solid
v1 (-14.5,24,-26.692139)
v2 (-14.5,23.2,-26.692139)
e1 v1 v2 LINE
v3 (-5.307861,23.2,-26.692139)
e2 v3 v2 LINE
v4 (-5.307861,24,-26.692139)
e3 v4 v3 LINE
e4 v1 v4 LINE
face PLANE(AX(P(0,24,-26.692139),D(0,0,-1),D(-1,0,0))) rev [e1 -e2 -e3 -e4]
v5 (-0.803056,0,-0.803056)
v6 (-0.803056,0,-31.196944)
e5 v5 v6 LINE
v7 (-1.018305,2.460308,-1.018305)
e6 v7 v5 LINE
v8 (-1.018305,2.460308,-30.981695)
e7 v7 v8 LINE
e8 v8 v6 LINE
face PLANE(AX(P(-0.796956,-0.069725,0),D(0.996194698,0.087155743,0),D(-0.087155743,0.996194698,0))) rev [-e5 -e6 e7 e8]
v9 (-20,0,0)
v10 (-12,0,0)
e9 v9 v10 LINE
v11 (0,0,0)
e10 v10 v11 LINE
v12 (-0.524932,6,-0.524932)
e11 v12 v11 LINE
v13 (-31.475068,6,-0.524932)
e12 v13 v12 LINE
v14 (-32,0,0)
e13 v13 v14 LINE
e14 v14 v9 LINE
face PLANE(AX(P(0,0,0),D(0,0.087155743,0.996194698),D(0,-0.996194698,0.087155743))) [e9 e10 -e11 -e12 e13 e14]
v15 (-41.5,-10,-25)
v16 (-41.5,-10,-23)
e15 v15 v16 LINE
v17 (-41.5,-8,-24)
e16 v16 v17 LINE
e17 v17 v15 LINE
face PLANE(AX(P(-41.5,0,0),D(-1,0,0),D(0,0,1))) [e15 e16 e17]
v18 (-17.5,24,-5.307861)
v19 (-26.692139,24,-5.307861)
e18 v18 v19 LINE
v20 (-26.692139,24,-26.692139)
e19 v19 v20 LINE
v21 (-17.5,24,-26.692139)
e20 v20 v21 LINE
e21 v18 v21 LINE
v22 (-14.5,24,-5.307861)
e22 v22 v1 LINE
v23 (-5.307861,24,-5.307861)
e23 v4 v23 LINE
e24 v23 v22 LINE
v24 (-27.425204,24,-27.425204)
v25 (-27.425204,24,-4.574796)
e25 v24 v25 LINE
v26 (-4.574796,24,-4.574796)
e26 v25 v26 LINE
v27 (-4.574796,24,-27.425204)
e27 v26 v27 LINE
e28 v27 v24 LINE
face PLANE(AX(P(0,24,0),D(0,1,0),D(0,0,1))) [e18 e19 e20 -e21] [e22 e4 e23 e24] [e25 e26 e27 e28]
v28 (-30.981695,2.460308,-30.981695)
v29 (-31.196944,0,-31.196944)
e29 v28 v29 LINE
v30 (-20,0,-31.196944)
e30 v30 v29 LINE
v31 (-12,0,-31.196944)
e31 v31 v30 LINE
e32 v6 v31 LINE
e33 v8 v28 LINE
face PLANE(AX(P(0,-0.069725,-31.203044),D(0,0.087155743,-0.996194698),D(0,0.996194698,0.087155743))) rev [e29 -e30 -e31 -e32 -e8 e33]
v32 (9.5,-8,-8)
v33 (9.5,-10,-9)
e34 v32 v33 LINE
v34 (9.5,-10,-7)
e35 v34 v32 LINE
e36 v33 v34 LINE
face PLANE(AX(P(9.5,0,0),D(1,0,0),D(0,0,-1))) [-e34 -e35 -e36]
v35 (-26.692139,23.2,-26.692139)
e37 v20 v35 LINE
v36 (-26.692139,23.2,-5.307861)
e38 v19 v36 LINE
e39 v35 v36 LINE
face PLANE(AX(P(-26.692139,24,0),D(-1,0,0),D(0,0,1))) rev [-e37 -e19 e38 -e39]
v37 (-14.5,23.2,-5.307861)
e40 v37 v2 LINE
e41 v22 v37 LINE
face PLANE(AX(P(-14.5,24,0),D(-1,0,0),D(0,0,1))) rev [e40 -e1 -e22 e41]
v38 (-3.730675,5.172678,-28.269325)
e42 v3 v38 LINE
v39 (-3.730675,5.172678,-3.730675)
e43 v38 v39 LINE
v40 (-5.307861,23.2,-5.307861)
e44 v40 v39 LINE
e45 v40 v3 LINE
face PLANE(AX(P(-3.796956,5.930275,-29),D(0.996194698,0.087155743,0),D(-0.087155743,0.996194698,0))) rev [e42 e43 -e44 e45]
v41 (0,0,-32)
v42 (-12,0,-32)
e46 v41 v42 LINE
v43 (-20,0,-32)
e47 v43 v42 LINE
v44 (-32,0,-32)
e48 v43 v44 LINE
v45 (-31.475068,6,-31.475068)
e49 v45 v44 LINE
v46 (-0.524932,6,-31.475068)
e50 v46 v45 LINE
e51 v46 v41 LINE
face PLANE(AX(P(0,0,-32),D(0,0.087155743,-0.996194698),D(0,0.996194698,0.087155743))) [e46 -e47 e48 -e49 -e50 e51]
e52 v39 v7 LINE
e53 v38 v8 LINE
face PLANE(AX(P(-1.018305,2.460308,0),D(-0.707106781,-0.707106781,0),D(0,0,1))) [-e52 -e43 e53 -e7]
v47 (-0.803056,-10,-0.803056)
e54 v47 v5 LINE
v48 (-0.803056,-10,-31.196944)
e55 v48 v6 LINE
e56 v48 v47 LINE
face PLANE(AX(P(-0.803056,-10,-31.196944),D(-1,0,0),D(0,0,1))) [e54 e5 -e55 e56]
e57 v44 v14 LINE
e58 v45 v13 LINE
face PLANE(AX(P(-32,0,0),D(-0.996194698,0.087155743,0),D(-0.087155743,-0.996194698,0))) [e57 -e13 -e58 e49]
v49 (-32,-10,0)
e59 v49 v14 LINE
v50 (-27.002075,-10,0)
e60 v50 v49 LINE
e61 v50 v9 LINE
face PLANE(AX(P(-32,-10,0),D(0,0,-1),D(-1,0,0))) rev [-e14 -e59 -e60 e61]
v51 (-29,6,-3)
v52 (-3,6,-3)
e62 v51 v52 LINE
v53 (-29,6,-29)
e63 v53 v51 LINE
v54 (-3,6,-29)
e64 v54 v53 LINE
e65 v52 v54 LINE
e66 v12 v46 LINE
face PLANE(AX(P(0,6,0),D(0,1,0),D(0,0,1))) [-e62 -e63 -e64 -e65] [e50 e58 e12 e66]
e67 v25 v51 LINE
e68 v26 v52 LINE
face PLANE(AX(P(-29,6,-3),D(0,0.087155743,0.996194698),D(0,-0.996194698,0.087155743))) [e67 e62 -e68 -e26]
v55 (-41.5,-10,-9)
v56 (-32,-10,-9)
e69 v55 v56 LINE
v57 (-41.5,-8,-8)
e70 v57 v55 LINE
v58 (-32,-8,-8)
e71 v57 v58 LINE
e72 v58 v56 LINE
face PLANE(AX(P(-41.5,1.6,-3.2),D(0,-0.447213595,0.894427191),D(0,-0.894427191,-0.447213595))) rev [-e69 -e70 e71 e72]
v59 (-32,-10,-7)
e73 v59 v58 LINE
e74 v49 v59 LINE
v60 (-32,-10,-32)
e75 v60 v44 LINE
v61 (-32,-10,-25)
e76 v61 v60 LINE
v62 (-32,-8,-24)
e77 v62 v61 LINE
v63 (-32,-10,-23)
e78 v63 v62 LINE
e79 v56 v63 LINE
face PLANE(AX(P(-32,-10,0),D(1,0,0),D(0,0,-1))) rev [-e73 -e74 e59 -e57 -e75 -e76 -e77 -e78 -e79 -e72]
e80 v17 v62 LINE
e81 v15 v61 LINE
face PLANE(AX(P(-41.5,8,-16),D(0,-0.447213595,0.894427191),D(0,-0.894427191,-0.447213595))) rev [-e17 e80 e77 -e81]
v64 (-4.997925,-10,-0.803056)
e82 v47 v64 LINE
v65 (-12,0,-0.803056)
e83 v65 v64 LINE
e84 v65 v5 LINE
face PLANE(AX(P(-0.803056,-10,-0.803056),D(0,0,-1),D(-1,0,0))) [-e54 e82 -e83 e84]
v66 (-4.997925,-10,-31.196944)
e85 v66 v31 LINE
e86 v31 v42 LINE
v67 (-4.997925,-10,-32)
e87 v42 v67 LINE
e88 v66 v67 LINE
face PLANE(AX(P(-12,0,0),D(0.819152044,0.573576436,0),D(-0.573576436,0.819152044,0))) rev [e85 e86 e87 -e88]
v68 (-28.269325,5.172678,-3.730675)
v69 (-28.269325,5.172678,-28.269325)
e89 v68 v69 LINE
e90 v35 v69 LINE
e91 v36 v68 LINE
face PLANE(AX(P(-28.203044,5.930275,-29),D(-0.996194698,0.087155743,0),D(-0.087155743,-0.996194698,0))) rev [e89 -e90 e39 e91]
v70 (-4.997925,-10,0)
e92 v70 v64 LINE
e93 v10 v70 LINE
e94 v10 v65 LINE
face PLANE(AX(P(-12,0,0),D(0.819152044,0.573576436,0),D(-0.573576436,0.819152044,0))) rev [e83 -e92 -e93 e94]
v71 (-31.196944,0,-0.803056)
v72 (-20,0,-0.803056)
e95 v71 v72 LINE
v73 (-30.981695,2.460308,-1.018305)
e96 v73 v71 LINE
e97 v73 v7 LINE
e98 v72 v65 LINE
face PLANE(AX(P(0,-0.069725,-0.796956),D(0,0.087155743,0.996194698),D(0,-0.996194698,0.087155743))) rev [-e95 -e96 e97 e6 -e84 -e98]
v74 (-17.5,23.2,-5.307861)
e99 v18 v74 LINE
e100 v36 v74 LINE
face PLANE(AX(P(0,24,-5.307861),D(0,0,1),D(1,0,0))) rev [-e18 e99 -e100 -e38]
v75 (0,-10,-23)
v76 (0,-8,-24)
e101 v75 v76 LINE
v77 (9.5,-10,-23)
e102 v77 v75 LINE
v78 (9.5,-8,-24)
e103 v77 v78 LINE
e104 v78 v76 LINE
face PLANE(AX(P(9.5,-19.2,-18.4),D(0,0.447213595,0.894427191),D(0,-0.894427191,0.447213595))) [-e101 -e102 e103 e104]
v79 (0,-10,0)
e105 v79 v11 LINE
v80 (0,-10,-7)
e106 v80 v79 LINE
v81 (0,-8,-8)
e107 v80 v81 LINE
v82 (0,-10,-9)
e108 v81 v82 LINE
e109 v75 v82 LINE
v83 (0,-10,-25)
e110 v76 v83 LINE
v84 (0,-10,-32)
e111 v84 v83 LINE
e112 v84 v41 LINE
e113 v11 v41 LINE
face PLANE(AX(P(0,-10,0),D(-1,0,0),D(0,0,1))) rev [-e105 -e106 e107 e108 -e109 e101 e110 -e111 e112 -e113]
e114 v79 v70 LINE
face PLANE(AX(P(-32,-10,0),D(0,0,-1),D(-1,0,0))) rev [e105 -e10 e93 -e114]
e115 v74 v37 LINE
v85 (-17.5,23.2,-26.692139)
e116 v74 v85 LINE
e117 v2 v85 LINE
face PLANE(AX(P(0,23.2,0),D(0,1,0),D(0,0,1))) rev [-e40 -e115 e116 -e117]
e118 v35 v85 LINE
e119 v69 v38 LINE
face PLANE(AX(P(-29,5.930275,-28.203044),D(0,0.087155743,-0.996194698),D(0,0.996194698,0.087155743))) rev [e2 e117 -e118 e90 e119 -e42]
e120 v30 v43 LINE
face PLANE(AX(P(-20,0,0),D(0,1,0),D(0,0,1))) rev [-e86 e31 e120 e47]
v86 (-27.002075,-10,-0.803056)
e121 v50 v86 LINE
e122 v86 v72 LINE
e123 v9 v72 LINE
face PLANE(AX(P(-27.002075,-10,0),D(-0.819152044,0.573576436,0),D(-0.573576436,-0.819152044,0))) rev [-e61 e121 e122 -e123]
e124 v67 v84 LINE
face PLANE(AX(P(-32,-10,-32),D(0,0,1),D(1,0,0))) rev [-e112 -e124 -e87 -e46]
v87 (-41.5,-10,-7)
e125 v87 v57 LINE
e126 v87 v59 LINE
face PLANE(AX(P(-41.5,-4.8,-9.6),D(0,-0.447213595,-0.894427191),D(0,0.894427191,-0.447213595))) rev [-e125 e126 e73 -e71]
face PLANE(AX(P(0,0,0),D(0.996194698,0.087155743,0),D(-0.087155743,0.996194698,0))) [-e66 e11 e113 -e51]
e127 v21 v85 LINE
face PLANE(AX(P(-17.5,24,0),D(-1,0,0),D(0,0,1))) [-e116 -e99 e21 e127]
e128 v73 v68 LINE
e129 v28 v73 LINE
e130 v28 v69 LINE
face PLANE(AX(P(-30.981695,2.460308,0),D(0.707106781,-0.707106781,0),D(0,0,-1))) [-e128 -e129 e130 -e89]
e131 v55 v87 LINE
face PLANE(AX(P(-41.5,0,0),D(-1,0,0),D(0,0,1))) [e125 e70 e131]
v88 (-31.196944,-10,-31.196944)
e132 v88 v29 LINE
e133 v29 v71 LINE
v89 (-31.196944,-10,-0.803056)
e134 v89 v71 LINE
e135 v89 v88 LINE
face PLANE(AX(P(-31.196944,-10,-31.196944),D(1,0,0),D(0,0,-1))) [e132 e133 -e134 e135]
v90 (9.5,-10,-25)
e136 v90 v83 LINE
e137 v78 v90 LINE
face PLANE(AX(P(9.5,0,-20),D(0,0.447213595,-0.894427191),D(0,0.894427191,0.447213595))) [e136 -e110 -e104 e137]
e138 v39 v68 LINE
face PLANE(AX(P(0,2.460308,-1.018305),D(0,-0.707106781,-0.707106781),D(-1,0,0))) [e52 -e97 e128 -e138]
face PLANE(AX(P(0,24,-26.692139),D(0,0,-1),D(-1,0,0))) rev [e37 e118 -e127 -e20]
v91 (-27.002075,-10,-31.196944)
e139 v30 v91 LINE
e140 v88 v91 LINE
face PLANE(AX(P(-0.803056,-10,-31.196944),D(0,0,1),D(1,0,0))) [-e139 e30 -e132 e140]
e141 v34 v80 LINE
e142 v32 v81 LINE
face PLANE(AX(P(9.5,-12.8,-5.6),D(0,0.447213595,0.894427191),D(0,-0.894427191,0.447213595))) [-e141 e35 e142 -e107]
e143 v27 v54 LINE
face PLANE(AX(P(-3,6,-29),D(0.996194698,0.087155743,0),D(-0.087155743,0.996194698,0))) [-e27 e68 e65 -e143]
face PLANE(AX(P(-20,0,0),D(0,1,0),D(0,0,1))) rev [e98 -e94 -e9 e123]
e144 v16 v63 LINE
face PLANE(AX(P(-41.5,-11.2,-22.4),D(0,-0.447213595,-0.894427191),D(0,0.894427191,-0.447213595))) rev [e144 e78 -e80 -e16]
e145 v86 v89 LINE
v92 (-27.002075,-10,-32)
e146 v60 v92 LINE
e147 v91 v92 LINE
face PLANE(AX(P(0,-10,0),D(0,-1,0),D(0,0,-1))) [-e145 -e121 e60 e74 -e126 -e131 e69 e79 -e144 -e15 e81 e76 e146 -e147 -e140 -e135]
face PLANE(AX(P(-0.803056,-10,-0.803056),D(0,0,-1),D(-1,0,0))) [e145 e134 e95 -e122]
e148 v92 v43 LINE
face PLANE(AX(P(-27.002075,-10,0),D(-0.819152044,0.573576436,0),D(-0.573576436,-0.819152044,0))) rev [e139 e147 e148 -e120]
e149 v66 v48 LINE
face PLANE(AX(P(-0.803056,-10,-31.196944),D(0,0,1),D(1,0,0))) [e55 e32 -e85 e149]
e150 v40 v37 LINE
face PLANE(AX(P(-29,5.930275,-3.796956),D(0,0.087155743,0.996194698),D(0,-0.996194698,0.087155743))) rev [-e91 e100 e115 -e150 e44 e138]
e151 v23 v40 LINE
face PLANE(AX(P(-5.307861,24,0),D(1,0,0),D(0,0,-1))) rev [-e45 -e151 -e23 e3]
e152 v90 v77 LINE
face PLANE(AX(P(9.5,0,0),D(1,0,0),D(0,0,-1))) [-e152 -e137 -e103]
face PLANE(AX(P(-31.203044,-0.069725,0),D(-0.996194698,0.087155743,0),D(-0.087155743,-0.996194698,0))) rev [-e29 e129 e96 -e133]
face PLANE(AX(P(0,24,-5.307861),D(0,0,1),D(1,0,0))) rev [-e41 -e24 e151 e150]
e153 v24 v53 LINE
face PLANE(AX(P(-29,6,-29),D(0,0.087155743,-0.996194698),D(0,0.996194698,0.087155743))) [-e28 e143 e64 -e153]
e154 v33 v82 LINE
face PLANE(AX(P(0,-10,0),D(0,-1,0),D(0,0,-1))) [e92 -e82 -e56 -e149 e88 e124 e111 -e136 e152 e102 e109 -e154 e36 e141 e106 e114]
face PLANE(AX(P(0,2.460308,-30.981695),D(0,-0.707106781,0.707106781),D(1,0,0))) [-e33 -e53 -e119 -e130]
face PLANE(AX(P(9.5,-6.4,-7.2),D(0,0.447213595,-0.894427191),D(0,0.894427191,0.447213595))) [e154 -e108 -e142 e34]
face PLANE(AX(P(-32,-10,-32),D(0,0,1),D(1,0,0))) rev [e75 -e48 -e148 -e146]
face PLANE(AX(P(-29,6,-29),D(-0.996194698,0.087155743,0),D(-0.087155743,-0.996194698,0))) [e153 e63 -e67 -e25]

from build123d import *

# Parameters (mm, degrees)
SKETCH1_W           = 32
SKETCH1_H           = 32
BOSS_EXTRUDE1_DEPTH = 6
BOSS_EXTRUDE1_TAPER = 5
SKETCH2_W           = 26
SKETCH2_H           = 26
BOSS_EXTRUDE2_DEPTH = 18
BOSS_EXTRUDE2_TAPER = 5
SHELL1_T            = -0.8
CHAMFER1_SIZE       = 2.5
CHAMFER1_SIZE_2     = 2.750157169
SKETCH3_W           = 9.192139117
SKETCH3_H           = 21.384278234
CUT_EXTRUDE1_DEPTH  = 51.855088412
SKETCH4_W           = 32
SKETCH4_H           = 32
SKETCH4_W_2         = 30.39388826
SKETCH4_H_2         = 30.39388826
BOSS_EXTRUDE3_DEPTH = 10
BOSS_EXTRUDE4_DEPTH = 9.5
BOSS_EXTRUDE5_START = -32
BOSS_EXTRUDE5_DEPTH = 9.5
CUT_EXTRUDE2_DEPTH  = 58.638962614


with BuildPart() as part:
    # Sketch1 → Boss-Extrude1 (new body)
    with BuildSketch(Plane(origin=(0, 0, 0), x_dir=(1, 0, 0), z_dir=(0, 1, 0))):
        with Locations((-16, 16)):
            Rectangle(SKETCH1_W, SKETCH1_H)
    extrude(amount=BOSS_EXTRUDE1_DEPTH, taper=BOSS_EXTRUDE1_TAPER)

    # Sketch2 → Boss-Extrude2 (add)
    with BuildSketch(Plane(origin=(0, 6, 0), x_dir=(1, 0, 0), z_dir=(0, 1, 0))):
        with Locations((-16, 16)):
            Rectangle(SKETCH2_W, SKETCH2_H)
    extrude(amount=BOSS_EXTRUDE2_DEPTH, taper=BOSS_EXTRUDE2_TAPER)

    # Shell1
    shell1_openings = [part.faces().sort_by_distance(p)[0] for p in [
        (-16, 0, -16),
    ]]
    offset(amount=SHELL1_T, openings=shell1_openings, kind=Kind.INTERSECTION)

    # Chamfer1
    # the kernel refuses this chamfer: 2.750157169, 2.5 mm, written as the material it adds along each edge
    with BuildSketch(Plane(origin=(5.830274952, 5.2, -1.25799692), x_dir=(0, 0.030161850139926293, -0.9995450278982617), z_dir=(-1, 0, 0))) as chamfer1_piece_1_section:
        Polygon((CHAMFER1_SIZE * 0.999545027898, CHAMFER1_SIZE * 0.0301618501399), (-CHAMFER1_SIZE_2 * 0.117163164513, CHAMFER1_SIZE_2 * 0.993112678869), (0, 0), align=None)
    chamfer1_piece_1 = extrude(amount=43.660549905, mode=Mode.PRIVATE)
    chamfer1_piece_1 = split(chamfer1_piece_1, bisect_by=Plane(origin=(-1.2737044, 5.379537315, -3.779154262), z_dir=(-0.9961946980917455, -0.08715574274765792, 0)), keep=Keep.TOP, mode=Mode.PRIVATE)
    chamfer1_piece_1 = split(chamfer1_piece_1, bisect_by=Plane(origin=(-3.729971497, 5.164641789, -3.779154262), z_dir=(0.9961946980917455, 0.08715574274765821, 0)), keep=Keep.TOP, mode=Mode.PRIVATE)
    chamfer1_piece_1 = split(chamfer1_piece_1, bisect_by=Plane(origin=(-2.501837948, 5.275543614, -3.739674149), z_dir=(0, -0.08715574274765829, -0.9961946980917455)), keep=Keep.TOP, mode=Mode.PRIVATE)
    add(chamfer1_piece_1)
    with BuildSketch(Plane(origin=(5.830274952, 5.2, -1.25799692), x_dir=(0, 0.030161850139926293, -0.9995450278982617), z_dir=(-1, 0, 0))) as chamfer1_piece_2_section:
        Polygon((CHAMFER1_SIZE * 0.999545027898, CHAMFER1_SIZE * 0.0301618501399), (-CHAMFER1_SIZE_2 * 0.117163164513, CHAMFER1_SIZE_2 * 0.993112678869), (0, 0), align=None)
    chamfer1_piece_2 = extrude(amount=43.660549905, mode=Mode.PRIVATE)
    chamfer1_piece_2 = split(chamfer1_piece_2, bisect_by=Plane(origin=(-1.187972058, 4.399612159, -1.99521412), z_dir=(-0.9961946980917455, -0.08715574274765792, 0)), keep=Keep.TOP, mode=Mode.PRIVATE)
    chamfer1_piece_2 = split(chamfer1_piece_2, bisect_by=Plane(origin=(-3.644239154, 4.184716633, -1.99521412), z_dir=(0.9961946980917455, 0.08715574274765821, 0)), keep=Keep.TOP, mode=Mode.PRIVATE)
    chamfer1_piece_2 = split(chamfer1_piece_2, bisect_by=Plane(origin=(-2.416105606, 4.148173113, -3.641042011), z_dir=(0, 0.08715574274765829, 0.9961946980917455)), keep=Keep.TOP, mode=Mode.PRIVATE)
    add(chamfer1_piece_2)
    with BuildSketch(Plane(origin=(5.830274952, 5.2, -1.25799692), x_dir=(0, 0.030161850139926293, -0.9995450278982617), z_dir=(-1, 0, 0))) as chamfer1_piece_3_section:
        Polygon((CHAMFER1_SIZE * 0.999545027898, CHAMFER1_SIZE * 0.0301618501399), (-CHAMFER1_SIZE_2 * 0.117163164513, CHAMFER1_SIZE_2 * 0.993112678869), (0, 0), align=None)
    chamfer1_piece_3 = extrude(amount=43.660549905, mode=Mode.PRIVATE)
    chamfer1_piece_3 = split(chamfer1_piece_3, bisect_by=Plane(origin=(-3.747130429, 5.360769289, -1.993289961), z_dir=(-0.9961946980917455, -0.08715574274765821, 0)), keep=Keep.TOP, mode=Mode.PRIVATE)
    chamfer1_piece_3 = split(chamfer1_piece_3, bisect_by=Plane(origin=(-16, 4.144649452, -3.64073373), z_dir=(0, 0.08715574274765829, 0.9961946980917455)), keep=Keep.TOP, mode=Mode.PRIVATE)
    chamfer1_piece_3 = split(chamfer1_piece_3, bisect_by=Plane(origin=(-28.252869571, 5.360769289, -1.993289961), z_dir=(0.9961946980917455, -0.08715574274765829, 0)), keep=Keep.TOP, mode=Mode.PRIVATE)
    add(chamfer1_piece_3)
    with BuildSketch(Plane(origin=(5.830274952, 5.2, -1.25799692), x_dir=(0, 0.030161850139926293, -0.9995450278982617), z_dir=(-1, 0, 0))) as chamfer1_piece_4_section:
        Polygon((CHAMFER1_SIZE * 0.999545027898, CHAMFER1_SIZE * 0.0301618501399), (-CHAMFER1_SIZE_2 * 0.117163164513, CHAMFER1_SIZE_2 * 0.993112678869), (0, 0), align=None)
    chamfer1_piece_4 = extrude(amount=43.660549905, mode=Mode.PRIVATE)
    chamfer1_piece_4 = split(chamfer1_piece_4, bisect_by=Plane(origin=(-29.498162052, 5.275543614, -3.739674149), z_dir=(0, -0.08715574274765829, -0.9961946980917455)), keep=Keep.TOP, mode=Mode.PRIVATE)
    chamfer1_piece_4 = split(chamfer1_piece_4, bisect_by=Plane(origin=(-28.270028503, 5.164641789, -3.779154262), z_dir=(-0.9961946980917455, 0.08715574274765829, 0)), keep=Keep.TOP, mode=Mode.PRIVATE)
    chamfer1_piece_4 = split(chamfer1_piece_4, bisect_by=Plane(origin=(-30.7262956, 5.379537315, -3.779154262), z_dir=(0.9961946980917455, -0.08715574274765851, 0)), keep=Keep.TOP, mode=Mode.PRIVATE)
    add(chamfer1_piece_4)
    with BuildSketch(Plane(origin=(5.830274952, 5.2, -1.25799692), x_dir=(0, 0.030161850139926293, -0.9995450278982617), z_dir=(-1, 0, 0))) as chamfer1_piece_5_section:
        Polygon((CHAMFER1_SIZE * 0.999545027898, CHAMFER1_SIZE * 0.0301618501399), (-CHAMFER1_SIZE_2 * 0.117163164513, CHAMFER1_SIZE_2 * 0.993112678869), (0, 0), align=None)
    chamfer1_piece_5 = extrude(amount=43.660549905, mode=Mode.PRIVATE)
    chamfer1_piece_5 = split(chamfer1_piece_5, bisect_by=Plane(origin=(-29.583894394, 4.148173113, -3.641042011), z_dir=(0, 0.08715574274765829, 0.9961946980917455)), keep=Keep.TOP, mode=Mode.PRIVATE)
    chamfer1_piece_5 = split(chamfer1_piece_5, bisect_by=Plane(origin=(-28.355760846, 4.184716633, -1.99521412), z_dir=(-0.9961946980917455, 0.08715574274765829, 0)), keep=Keep.TOP, mode=Mode.PRIVATE)
    chamfer1_piece_5 = split(chamfer1_piece_5, bisect_by=Plane(origin=(-30.812027942, 4.399612159, -1.99521412), z_dir=(0.9961946980917455, -0.08715574274765851, 0)), keep=Keep.TOP, mode=Mode.PRIVATE)
    add(chamfer1_piece_5)
    with BuildSketch(Plane(origin=(-30.74200308, 5.2, 5.830274952), x_dir=(0.9995450278982617, 0.030161850139926356, 0), z_dir=(0, 0, -1))) as chamfer1_piece_6_section:
        Polygon((CHAMFER1_SIZE * 0.999545027898, CHAMFER1_SIZE * 0.0301618501399), (-CHAMFER1_SIZE_2 * 0.117163164513, CHAMFER1_SIZE_2 * 0.993112678869), (0, 0), align=None)
    chamfer1_piece_6 = extrude(amount=43.660549905, mode=Mode.PRIVATE)
    chamfer1_piece_6 = split(chamfer1_piece_6, bisect_by=Plane(origin=(-28.220845738, 5.164641789, -3.729971497), z_dir=(0, 0.08715574274765829, 0.9961946980917455)), keep=Keep.TOP, mode=Mode.PRIVATE)
    chamfer1_piece_6 = split(chamfer1_piece_6, bisect_by=Plane(origin=(-28.260325851, 5.275543614, -2.501837948), z_dir=(0.9961946980917455, -0.08715574274765829, 0)), keep=Keep.TOP, mode=Mode.PRIVATE)
    chamfer1_piece_6 = split(chamfer1_piece_6, bisect_by=Plane(origin=(-28.220845738, 5.379537315, -1.2737044), z_dir=(0, -0.08715574274765792, -0.9961946980917455)), keep=Keep.TOP, mode=Mode.PRIVATE)
    add(chamfer1_piece_6)
    with BuildSketch(Plane(origin=(-30.74200308, 5.2, 5.830274952), x_dir=(0.9995450278982617, 0.030161850139926356, 0), z_dir=(0, 0, -1))) as chamfer1_piece_7_section:
        Polygon((CHAMFER1_SIZE * 0.999545027898, CHAMFER1_SIZE * 0.0301618501399), (-CHAMFER1_SIZE_2 * 0.117163164513, CHAMFER1_SIZE_2 * 0.993112678869), (0, 0), align=None)
    chamfer1_piece_7 = extrude(amount=43.660549905, mode=Mode.PRIVATE)
    chamfer1_piece_7 = split(chamfer1_piece_7, bisect_by=Plane(origin=(-30.00478588, 4.184716633, -3.644239154), z_dir=(0, 0.08715574274765829, 0.9961946980917455)), keep=Keep.TOP, mode=Mode.PRIVATE)
    chamfer1_piece_7 = split(chamfer1_piece_7, bisect_by=Plane(origin=(-28.358957989, 4.148173113, -2.416105606), z_dir=(-0.9961946980917455, 0.08715574274765829, 0)), keep=Keep.TOP, mode=Mode.PRIVATE)
    chamfer1_piece_7 = split(chamfer1_piece_7, bisect_by=Plane(origin=(-30.00478588, 4.399612159, -1.187972058), z_dir=(0, -0.08715574274765792, -0.9961946980917455)), keep=Keep.TOP, mode=Mode.PRIVATE)
    add(chamfer1_piece_7)
    with BuildSketch(Plane(origin=(-30.74200308, 5.2, 5.830274952), x_dir=(0.9995450278982617, 0.030161850139926356, 0), z_dir=(0, 0, -1))) as chamfer1_piece_8_section:
        Polygon((CHAMFER1_SIZE * 0.999545027898, CHAMFER1_SIZE * 0.0301618501399), (-CHAMFER1_SIZE_2 * 0.117163164513, CHAMFER1_SIZE_2 * 0.993112678869), (0, 0), align=None)
    chamfer1_piece_8 = extrude(amount=43.660549905, mode=Mode.PRIVATE)
    chamfer1_piece_8 = split(chamfer1_piece_8, bisect_by=Plane(origin=(-30.006710039, 5.360769289, -28.252869571), z_dir=(0, -0.08715574274765829, 0.9961946980917455)), keep=Keep.TOP, mode=Mode.PRIVATE)
    chamfer1_piece_8 = split(chamfer1_piece_8, bisect_by=Plane(origin=(-30.006710039, 5.360769289, -3.747130429), z_dir=(0, -0.08715574274765829, -0.9961946980917455)), keep=Keep.TOP, mode=Mode.PRIVATE)
    chamfer1_piece_8 = split(chamfer1_piece_8, bisect_by=Plane(origin=(-28.35926627, 4.144649452, -16), z_dir=(-0.9961946980917455, 0.08715574274765829, 0)), keep=Keep.TOP, mode=Mode.PRIVATE)
    add(chamfer1_piece_8)
    with BuildSketch(Plane(origin=(-30.74200308, 5.2, 5.830274952), x_dir=(0.9995450278982617, 0.030161850139926356, 0), z_dir=(0, 0, -1))) as chamfer1_piece_9_section:
        Polygon((CHAMFER1_SIZE * 0.999545027898, CHAMFER1_SIZE * 0.0301618501399), (-CHAMFER1_SIZE_2 * 0.117163164513, CHAMFER1_SIZE_2 * 0.993112678869), (0, 0), align=None)
    chamfer1_piece_9 = extrude(amount=43.660549905, mode=Mode.PRIVATE)
    chamfer1_piece_9 = split(chamfer1_piece_9, bisect_by=Plane(origin=(-28.220845738, 5.379537315, -30.7262956), z_dir=(0, -0.08715574274765836, 0.9961946980917455)), keep=Keep.TOP, mode=Mode.PRIVATE)
    chamfer1_piece_9 = split(chamfer1_piece_9, bisect_by=Plane(origin=(-28.220845738, 5.164641789, -28.270028503), z_dir=(0, 0.08715574274765829, -0.9961946980917455)), keep=Keep.TOP, mode=Mode.PRIVATE)
    chamfer1_piece_9 = split(chamfer1_piece_9, bisect_by=Plane(origin=(-28.260325851, 5.275543614, -29.498162052), z_dir=(0.9961946980917455, -0.08715574274765829, 0)), keep=Keep.TOP, mode=Mode.PRIVATE)
    add(chamfer1_piece_9)
    with BuildSketch(Plane(origin=(-30.74200308, 5.2, 5.830274952), x_dir=(0.9995450278982617, 0.030161850139926356, 0), z_dir=(0, 0, -1))) as chamfer1_piece_10_section:
        Polygon((CHAMFER1_SIZE * 0.999545027898, CHAMFER1_SIZE * 0.0301618501399), (-CHAMFER1_SIZE_2 * 0.117163164513, CHAMFER1_SIZE_2 * 0.993112678869), (0, 0), align=None)
    chamfer1_piece_10 = extrude(amount=43.660549905, mode=Mode.PRIVATE)
    chamfer1_piece_10 = split(chamfer1_piece_10, bisect_by=Plane(origin=(-30.00478588, 4.399612159, -30.812027942), z_dir=(0, -0.08715574274765836, 0.9961946980917455)), keep=Keep.TOP, mode=Mode.PRIVATE)
    chamfer1_piece_10 = split(chamfer1_piece_10, bisect_by=Plane(origin=(-30.00478588, 4.184716633, -28.355760846), z_dir=(0, 0.08715574274765829, -0.9961946980917455)), keep=Keep.TOP, mode=Mode.PRIVATE)
    chamfer1_piece_10 = split(chamfer1_piece_10, bisect_by=Plane(origin=(-28.358957989, 4.148173113, -29.583894394), z_dir=(-0.9961946980917455, 0.08715574274765829, 0)), keep=Keep.TOP, mode=Mode.PRIVATE)
    add(chamfer1_piece_10)
    with BuildSketch(Plane(origin=(5.830274952, 5.2, -30.74200308), x_dir=(0, -0.9937112432628153, -0.11197305485280758), z_dir=(-1, 0, 0))) as chamfer1_piece_11_section:
        Polygon((CHAMFER1_SIZE_2 * 0.99968896676, CHAMFER1_SIZE_2 * 0.0249393220908), (-CHAMFER1_SIZE * 0.111973054853, CHAMFER1_SIZE * 0.993711243263), (0, 0), align=None)
    chamfer1_piece_11 = extrude(amount=43.660549905, mode=Mode.PRIVATE)
    chamfer1_piece_11 = split(chamfer1_piece_11, bisect_by=Plane(origin=(-1.187972058, 4.399612159, -30.00478588), z_dir=(-0.9961946980917455, -0.08715574274765792, 0)), keep=Keep.TOP, mode=Mode.PRIVATE)
    chamfer1_piece_11 = split(chamfer1_piece_11, bisect_by=Plane(origin=(-2.416105606, 4.148173113, -28.358957989), z_dir=(0, 0.08715574274765829, -0.9961946980917455)), keep=Keep.TOP, mode=Mode.PRIVATE)
    chamfer1_piece_11 = split(chamfer1_piece_11, bisect_by=Plane(origin=(-3.644239154, 4.184716633, -30.00478588), z_dir=(0.9961946980917455, 0.08715574274765821, 0)), keep=Keep.TOP, mode=Mode.PRIVATE)
    add(chamfer1_piece_11)
    with BuildSketch(Plane(origin=(5.830274952, 5.2, -30.74200308), x_dir=(0, -0.9937112432628153, -0.11197305485280758), z_dir=(-1, 0, 0))) as chamfer1_piece_12_section:
        Polygon((CHAMFER1_SIZE_2 * 0.99968896676, CHAMFER1_SIZE_2 * 0.0249393220908), (-CHAMFER1_SIZE * 0.111973054853, CHAMFER1_SIZE * 0.993711243263), (0, 0), align=None)
    chamfer1_piece_12 = extrude(amount=43.660549905, mode=Mode.PRIVATE)
    chamfer1_piece_12 = split(chamfer1_piece_12, bisect_by=Plane(origin=(-1.2737044, 5.379537315, -28.220845738), z_dir=(-0.9961946980917455, -0.08715574274765792, 0)), keep=Keep.TOP, mode=Mode.PRIVATE)
    chamfer1_piece_12 = split(chamfer1_piece_12, bisect_by=Plane(origin=(-2.501837948, 5.275543614, -28.260325851), z_dir=(0, -0.08715574274765829, 0.9961946980917455)), keep=Keep.TOP, mode=Mode.PRIVATE)
    chamfer1_piece_12 = split(chamfer1_piece_12, bisect_by=Plane(origin=(-3.729971497, 5.164641789, -28.220845738), z_dir=(0.9961946980917455, 0.08715574274765821, 0)), keep=Keep.TOP, mode=Mode.PRIVATE)
    add(chamfer1_piece_12)
    with BuildSketch(Plane(origin=(5.830274952, 5.2, -30.74200308), x_dir=(0, -0.9937112432628153, -0.11197305485280758), z_dir=(-1, 0, 0))) as chamfer1_piece_13_section:
        Polygon((CHAMFER1_SIZE_2 * 0.99968896676, CHAMFER1_SIZE_2 * 0.0249393220908), (-CHAMFER1_SIZE * 0.111973054853, CHAMFER1_SIZE * 0.993711243263), (0, 0), align=None)
    chamfer1_piece_13 = extrude(amount=43.660549905, mode=Mode.PRIVATE)
    chamfer1_piece_13 = split(chamfer1_piece_13, bisect_by=Plane(origin=(-16, 4.144649452, -28.35926627), z_dir=(0, 0.08715574274765829, -0.9961946980917455)), keep=Keep.TOP, mode=Mode.PRIVATE)
    chamfer1_piece_13 = split(chamfer1_piece_13, bisect_by=Plane(origin=(-3.747130429, 5.360769289, -30.006710039), z_dir=(-0.9961946980917455, -0.08715574274765821, 0)), keep=Keep.TOP, mode=Mode.PRIVATE)
    chamfer1_piece_13 = split(chamfer1_piece_13, bisect_by=Plane(origin=(-28.252869571, 5.360769289, -30.006710039), z_dir=(0.9961946980917455, -0.08715574274765829, 0)), keep=Keep.TOP, mode=Mode.PRIVATE)
    add(chamfer1_piece_13)
    with BuildSketch(Plane(origin=(5.830274952, 5.2, -30.74200308), x_dir=(0, -0.9937112432628153, -0.11197305485280758), z_dir=(-1, 0, 0))) as chamfer1_piece_14_section:
        Polygon((CHAMFER1_SIZE_2 * 0.99968896676, CHAMFER1_SIZE_2 * 0.0249393220908), (-CHAMFER1_SIZE * 0.111973054853, CHAMFER1_SIZE * 0.993711243263), (0, 0), align=None)
    chamfer1_piece_14 = extrude(amount=43.660549905, mode=Mode.PRIVATE)
    chamfer1_piece_14 = split(chamfer1_piece_14, bisect_by=Plane(origin=(-30.812027942, 4.399612159, -30.00478588), z_dir=(0.9961946980917455, -0.08715574274765851, 0)), keep=Keep.TOP, mode=Mode.PRIVATE)
    chamfer1_piece_14 = split(chamfer1_piece_14, bisect_by=Plane(origin=(-29.583894394, 4.148173113, -28.358957989), z_dir=(0, 0.08715574274765829, -0.9961946980917455)), keep=Keep.TOP, mode=Mode.PRIVATE)
    chamfer1_piece_14 = split(chamfer1_piece_14, bisect_by=Plane(origin=(-28.355760846, 4.184716633, -30.00478588), z_dir=(-0.9961946980917455, 0.08715574274765829, 0)), keep=Keep.TOP, mode=Mode.PRIVATE)
    add(chamfer1_piece_14)
    with BuildSketch(Plane(origin=(5.830274952, 5.2, -30.74200308), x_dir=(0, -0.9937112432628153, -0.11197305485280758), z_dir=(-1, 0, 0))) as chamfer1_piece_15_section:
        Polygon((CHAMFER1_SIZE_2 * 0.99968896676, CHAMFER1_SIZE_2 * 0.0249393220908), (-CHAMFER1_SIZE * 0.111973054853, CHAMFER1_SIZE * 0.993711243263), (0, 0), align=None)
    chamfer1_piece_15 = extrude(amount=43.660549905, mode=Mode.PRIVATE)
    chamfer1_piece_15 = split(chamfer1_piece_15, bisect_by=Plane(origin=(-30.7262956, 5.379537315, -28.220845738), z_dir=(0.9961946980917455, -0.08715574274765851, 0)), keep=Keep.TOP, mode=Mode.PRIVATE)
    chamfer1_piece_15 = split(chamfer1_piece_15, bisect_by=Plane(origin=(-29.498162052, 5.275543614, -28.260325851), z_dir=(0, -0.08715574274765829, 0.9961946980917455)), keep=Keep.TOP, mode=Mode.PRIVATE)
    chamfer1_piece_15 = split(chamfer1_piece_15, bisect_by=Plane(origin=(-28.270028503, 5.164641789, -28.220845738), z_dir=(-0.9961946980917455, 0.08715574274765829, 0)), keep=Keep.TOP, mode=Mode.PRIVATE)
    add(chamfer1_piece_15)
    with BuildSketch(Plane(origin=(-1.25799692, 5.2, 5.830274952), x_dir=(0.11197305485280797, -0.9937112432628151, 0), z_dir=(0, 0, -1))) as chamfer1_piece_16_section:
        Polygon((CHAMFER1_SIZE_2 * 0.99968896676, CHAMFER1_SIZE_2 * 0.0249393220908), (-CHAMFER1_SIZE * 0.111973054853, CHAMFER1_SIZE * 0.993711243263), (0, 0), align=None)
    chamfer1_piece_16 = extrude(amount=43.660549905, mode=Mode.PRIVATE)
    chamfer1_piece_16 = split(chamfer1_piece_16, bisect_by=Plane(origin=(-1.99521412, 4.399612159, -1.187972058), z_dir=(0, -0.08715574274765792, -0.9961946980917455)), keep=Keep.TOP, mode=Mode.PRIVATE)
    chamfer1_piece_16 = split(chamfer1_piece_16, bisect_by=Plane(origin=(-3.641042011, 4.148173113, -2.416105606), z_dir=(0.9961946980917455, 0.08715574274765821, 0)), keep=Keep.TOP, mode=Mode.PRIVATE)
    chamfer1_piece_16 = split(chamfer1_piece_16, bisect_by=Plane(origin=(-1.99521412, 4.184716633, -3.644239154), z_dir=(0, 0.08715574274765829, 0.9961946980917455)), keep=Keep.TOP, mode=Mode.PRIVATE)
    add(chamfer1_piece_16)
    with BuildSketch(Plane(origin=(-1.25799692, 5.2, 5.830274952), x_dir=(0.11197305485280797, -0.9937112432628151, 0), z_dir=(0, 0, -1))) as chamfer1_piece_17_section:
        Polygon((CHAMFER1_SIZE_2 * 0.99968896676, CHAMFER1_SIZE_2 * 0.0249393220908), (-CHAMFER1_SIZE * 0.111973054853, CHAMFER1_SIZE * 0.993711243263), (0, 0), align=None)
    chamfer1_piece_17 = extrude(amount=43.660549905, mode=Mode.PRIVATE)
    chamfer1_piece_17 = split(chamfer1_piece_17, bisect_by=Plane(origin=(-3.779154262, 5.379537315, -1.2737044), z_dir=(0, -0.08715574274765792, -0.9961946980917455)), keep=Keep.TOP, mode=Mode.PRIVATE)
    chamfer1_piece_17 = split(chamfer1_piece_17, bisect_by=Plane(origin=(-3.739674149, 5.275543614, -2.501837948), z_dir=(-0.9961946980917455, -0.08715574274765821, 0)), keep=Keep.TOP, mode=Mode.PRIVATE)
    chamfer1_piece_17 = split(chamfer1_piece_17, bisect_by=Plane(origin=(-3.779154262, 5.164641789, -3.729971497), z_dir=(0, 0.08715574274765829, 0.9961946980917455)), keep=Keep.TOP, mode=Mode.PRIVATE)
    add(chamfer1_piece_17)
    with BuildSketch(Plane(origin=(-1.25799692, 5.2, 5.830274952), x_dir=(0.11197305485280797, -0.9937112432628151, 0), z_dir=(0, 0, -1))) as chamfer1_piece_18_section:
        Polygon((CHAMFER1_SIZE_2 * 0.99968896676, CHAMFER1_SIZE_2 * 0.0249393220908), (-CHAMFER1_SIZE * 0.111973054853, CHAMFER1_SIZE * 0.993711243263), (0, 0), align=None)
    chamfer1_piece_18 = extrude(amount=43.660549905, mode=Mode.PRIVATE)
    chamfer1_piece_18 = split(chamfer1_piece_18, bisect_by=Plane(origin=(-1.993289961, 5.360769289, -28.252869571), z_dir=(0, -0.08715574274765829, 0.9961946980917455)), keep=Keep.TOP, mode=Mode.PRIVATE)
    chamfer1_piece_18 = split(chamfer1_piece_18, bisect_by=Plane(origin=(-3.64073373, 4.144649452, -16), z_dir=(0.9961946980917455, 0.08715574274765821, 0)), keep=Keep.TOP, mode=Mode.PRIVATE)
    chamfer1_piece_18 = split(chamfer1_piece_18, bisect_by=Plane(origin=(-1.993289961, 5.360769289, -3.747130429), z_dir=(0, -0.08715574274765829, -0.9961946980917455)), keep=Keep.TOP, mode=Mode.PRIVATE)
    add(chamfer1_piece_18)
    with BuildSketch(Plane(origin=(-1.25799692, 5.2, 5.830274952), x_dir=(0.11197305485280797, -0.9937112432628151, 0), z_dir=(0, 0, -1))) as chamfer1_piece_19_section:
        Polygon((CHAMFER1_SIZE_2 * 0.99968896676, CHAMFER1_SIZE_2 * 0.0249393220908), (-CHAMFER1_SIZE * 0.111973054853, CHAMFER1_SIZE * 0.993711243263), (0, 0), align=None)
    chamfer1_piece_19 = extrude(amount=43.660549905, mode=Mode.PRIVATE)
    chamfer1_piece_19 = split(chamfer1_piece_19, bisect_by=Plane(origin=(-1.99521412, 4.399612159, -30.812027942), z_dir=(0, -0.08715574274765836, 0.9961946980917455)), keep=Keep.TOP, mode=Mode.PRIVATE)
    chamfer1_piece_19 = split(chamfer1_piece_19, bisect_by=Plane(origin=(-1.99521412, 4.184716633, -28.355760846), z_dir=(0, 0.08715574274765829, -0.9961946980917455)), keep=Keep.TOP, mode=Mode.PRIVATE)
    chamfer1_piece_19 = split(chamfer1_piece_19, bisect_by=Plane(origin=(-3.641042011, 4.148173113, -29.583894394), z_dir=(0.9961946980917455, 0.08715574274765821, 0)), keep=Keep.TOP, mode=Mode.PRIVATE)
    add(chamfer1_piece_19)
    with BuildSketch(Plane(origin=(-1.25799692, 5.2, 5.830274952), x_dir=(0.11197305485280797, -0.9937112432628151, 0), z_dir=(0, 0, -1))) as chamfer1_piece_20_section:
        Polygon((CHAMFER1_SIZE_2 * 0.99968896676, CHAMFER1_SIZE_2 * 0.0249393220908), (-CHAMFER1_SIZE * 0.111973054853, CHAMFER1_SIZE * 0.993711243263), (0, 0), align=None)
    chamfer1_piece_20 = extrude(amount=43.660549905, mode=Mode.PRIVATE)
    chamfer1_piece_20 = split(chamfer1_piece_20, bisect_by=Plane(origin=(-3.779154262, 5.379537315, -30.7262956), z_dir=(0, -0.08715574274765836, 0.9961946980917455)), keep=Keep.TOP, mode=Mode.PRIVATE)
    chamfer1_piece_20 = split(chamfer1_piece_20, bisect_by=Plane(origin=(-3.779154262, 5.164641789, -28.270028503), z_dir=(0, 0.08715574274765829, -0.9961946980917455)), keep=Keep.TOP, mode=Mode.PRIVATE)
    chamfer1_piece_20 = split(chamfer1_piece_20, bisect_by=Plane(origin=(-3.739674149, 5.275543614, -29.498162052), z_dir=(-0.9961946980917455, -0.08715574274765821, 0)), keep=Keep.TOP, mode=Mode.PRIVATE)
    add(chamfer1_piece_20)

    # Sketch3 → Cut-Extrude1 (cut, through all)
    with BuildSketch(Plane.XZ.offset(-23.2)):
        with Locations((-22.096069558, -16)):
            Rectangle(SKETCH3_W, SKETCH3_H)
        with Locations((-9.903930442, -16)):
            Rectangle(SKETCH3_W, SKETCH3_H)
    extrude(amount=-CUT_EXTRUDE1_DEPTH, mode=Mode.SUBTRACT)

    # Sketch4 → Boss-Extrude3 (add)
    with BuildSketch(Plane.XZ):
        with Locations((-16, -16)):
            Rectangle(SKETCH4_W, SKETCH4_H)
        with Locations((-16, -16)):
            Rectangle(SKETCH4_W_2, SKETCH4_H_2, mode=Mode.SUBTRACT)
    extrude(amount=BOSS_EXTRUDE3_DEPTH)

    # Sketch5 → Boss-Extrude4 (add)
    with BuildSketch(Plane.ZY.offset(32)):
        Polygon((-24, -8), (-25, -10), (-23, -10), align=None)
        Polygon((-8, -8), (-9, -10), (-7, -10), align=None)
    extrude(amount=BOSS_EXTRUDE4_DEPTH)

    # Sketch5<3> → Boss-Extrude5 (add)
    with BuildSketch(Plane.ZY.offset(32).offset(BOSS_EXTRUDE5_START)):
        Polygon((-8, -8), (-9, -10), (-7, -10), align=None)
        Polygon((-24, -8), (-25, -10), (-23, -10), align=None)
    extrude(amount=-BOSS_EXTRUDE5_DEPTH)

    # Sketch6 → Cut-Extrude2 (cut, through all)
    with BuildSketch(Plane(origin=(0, 0, -32), x_dir=(-1, 0, 0), z_dir=(0, 0, -1))):
        Polygon((12, 0), (4.997924618, -10), (27.002075382, -10), (20, 0), align=None)
    extrude(amount=-CUT_EXTRUDE2_DEPTH, mode=Mode.SUBTRACT)


solid = part.part
